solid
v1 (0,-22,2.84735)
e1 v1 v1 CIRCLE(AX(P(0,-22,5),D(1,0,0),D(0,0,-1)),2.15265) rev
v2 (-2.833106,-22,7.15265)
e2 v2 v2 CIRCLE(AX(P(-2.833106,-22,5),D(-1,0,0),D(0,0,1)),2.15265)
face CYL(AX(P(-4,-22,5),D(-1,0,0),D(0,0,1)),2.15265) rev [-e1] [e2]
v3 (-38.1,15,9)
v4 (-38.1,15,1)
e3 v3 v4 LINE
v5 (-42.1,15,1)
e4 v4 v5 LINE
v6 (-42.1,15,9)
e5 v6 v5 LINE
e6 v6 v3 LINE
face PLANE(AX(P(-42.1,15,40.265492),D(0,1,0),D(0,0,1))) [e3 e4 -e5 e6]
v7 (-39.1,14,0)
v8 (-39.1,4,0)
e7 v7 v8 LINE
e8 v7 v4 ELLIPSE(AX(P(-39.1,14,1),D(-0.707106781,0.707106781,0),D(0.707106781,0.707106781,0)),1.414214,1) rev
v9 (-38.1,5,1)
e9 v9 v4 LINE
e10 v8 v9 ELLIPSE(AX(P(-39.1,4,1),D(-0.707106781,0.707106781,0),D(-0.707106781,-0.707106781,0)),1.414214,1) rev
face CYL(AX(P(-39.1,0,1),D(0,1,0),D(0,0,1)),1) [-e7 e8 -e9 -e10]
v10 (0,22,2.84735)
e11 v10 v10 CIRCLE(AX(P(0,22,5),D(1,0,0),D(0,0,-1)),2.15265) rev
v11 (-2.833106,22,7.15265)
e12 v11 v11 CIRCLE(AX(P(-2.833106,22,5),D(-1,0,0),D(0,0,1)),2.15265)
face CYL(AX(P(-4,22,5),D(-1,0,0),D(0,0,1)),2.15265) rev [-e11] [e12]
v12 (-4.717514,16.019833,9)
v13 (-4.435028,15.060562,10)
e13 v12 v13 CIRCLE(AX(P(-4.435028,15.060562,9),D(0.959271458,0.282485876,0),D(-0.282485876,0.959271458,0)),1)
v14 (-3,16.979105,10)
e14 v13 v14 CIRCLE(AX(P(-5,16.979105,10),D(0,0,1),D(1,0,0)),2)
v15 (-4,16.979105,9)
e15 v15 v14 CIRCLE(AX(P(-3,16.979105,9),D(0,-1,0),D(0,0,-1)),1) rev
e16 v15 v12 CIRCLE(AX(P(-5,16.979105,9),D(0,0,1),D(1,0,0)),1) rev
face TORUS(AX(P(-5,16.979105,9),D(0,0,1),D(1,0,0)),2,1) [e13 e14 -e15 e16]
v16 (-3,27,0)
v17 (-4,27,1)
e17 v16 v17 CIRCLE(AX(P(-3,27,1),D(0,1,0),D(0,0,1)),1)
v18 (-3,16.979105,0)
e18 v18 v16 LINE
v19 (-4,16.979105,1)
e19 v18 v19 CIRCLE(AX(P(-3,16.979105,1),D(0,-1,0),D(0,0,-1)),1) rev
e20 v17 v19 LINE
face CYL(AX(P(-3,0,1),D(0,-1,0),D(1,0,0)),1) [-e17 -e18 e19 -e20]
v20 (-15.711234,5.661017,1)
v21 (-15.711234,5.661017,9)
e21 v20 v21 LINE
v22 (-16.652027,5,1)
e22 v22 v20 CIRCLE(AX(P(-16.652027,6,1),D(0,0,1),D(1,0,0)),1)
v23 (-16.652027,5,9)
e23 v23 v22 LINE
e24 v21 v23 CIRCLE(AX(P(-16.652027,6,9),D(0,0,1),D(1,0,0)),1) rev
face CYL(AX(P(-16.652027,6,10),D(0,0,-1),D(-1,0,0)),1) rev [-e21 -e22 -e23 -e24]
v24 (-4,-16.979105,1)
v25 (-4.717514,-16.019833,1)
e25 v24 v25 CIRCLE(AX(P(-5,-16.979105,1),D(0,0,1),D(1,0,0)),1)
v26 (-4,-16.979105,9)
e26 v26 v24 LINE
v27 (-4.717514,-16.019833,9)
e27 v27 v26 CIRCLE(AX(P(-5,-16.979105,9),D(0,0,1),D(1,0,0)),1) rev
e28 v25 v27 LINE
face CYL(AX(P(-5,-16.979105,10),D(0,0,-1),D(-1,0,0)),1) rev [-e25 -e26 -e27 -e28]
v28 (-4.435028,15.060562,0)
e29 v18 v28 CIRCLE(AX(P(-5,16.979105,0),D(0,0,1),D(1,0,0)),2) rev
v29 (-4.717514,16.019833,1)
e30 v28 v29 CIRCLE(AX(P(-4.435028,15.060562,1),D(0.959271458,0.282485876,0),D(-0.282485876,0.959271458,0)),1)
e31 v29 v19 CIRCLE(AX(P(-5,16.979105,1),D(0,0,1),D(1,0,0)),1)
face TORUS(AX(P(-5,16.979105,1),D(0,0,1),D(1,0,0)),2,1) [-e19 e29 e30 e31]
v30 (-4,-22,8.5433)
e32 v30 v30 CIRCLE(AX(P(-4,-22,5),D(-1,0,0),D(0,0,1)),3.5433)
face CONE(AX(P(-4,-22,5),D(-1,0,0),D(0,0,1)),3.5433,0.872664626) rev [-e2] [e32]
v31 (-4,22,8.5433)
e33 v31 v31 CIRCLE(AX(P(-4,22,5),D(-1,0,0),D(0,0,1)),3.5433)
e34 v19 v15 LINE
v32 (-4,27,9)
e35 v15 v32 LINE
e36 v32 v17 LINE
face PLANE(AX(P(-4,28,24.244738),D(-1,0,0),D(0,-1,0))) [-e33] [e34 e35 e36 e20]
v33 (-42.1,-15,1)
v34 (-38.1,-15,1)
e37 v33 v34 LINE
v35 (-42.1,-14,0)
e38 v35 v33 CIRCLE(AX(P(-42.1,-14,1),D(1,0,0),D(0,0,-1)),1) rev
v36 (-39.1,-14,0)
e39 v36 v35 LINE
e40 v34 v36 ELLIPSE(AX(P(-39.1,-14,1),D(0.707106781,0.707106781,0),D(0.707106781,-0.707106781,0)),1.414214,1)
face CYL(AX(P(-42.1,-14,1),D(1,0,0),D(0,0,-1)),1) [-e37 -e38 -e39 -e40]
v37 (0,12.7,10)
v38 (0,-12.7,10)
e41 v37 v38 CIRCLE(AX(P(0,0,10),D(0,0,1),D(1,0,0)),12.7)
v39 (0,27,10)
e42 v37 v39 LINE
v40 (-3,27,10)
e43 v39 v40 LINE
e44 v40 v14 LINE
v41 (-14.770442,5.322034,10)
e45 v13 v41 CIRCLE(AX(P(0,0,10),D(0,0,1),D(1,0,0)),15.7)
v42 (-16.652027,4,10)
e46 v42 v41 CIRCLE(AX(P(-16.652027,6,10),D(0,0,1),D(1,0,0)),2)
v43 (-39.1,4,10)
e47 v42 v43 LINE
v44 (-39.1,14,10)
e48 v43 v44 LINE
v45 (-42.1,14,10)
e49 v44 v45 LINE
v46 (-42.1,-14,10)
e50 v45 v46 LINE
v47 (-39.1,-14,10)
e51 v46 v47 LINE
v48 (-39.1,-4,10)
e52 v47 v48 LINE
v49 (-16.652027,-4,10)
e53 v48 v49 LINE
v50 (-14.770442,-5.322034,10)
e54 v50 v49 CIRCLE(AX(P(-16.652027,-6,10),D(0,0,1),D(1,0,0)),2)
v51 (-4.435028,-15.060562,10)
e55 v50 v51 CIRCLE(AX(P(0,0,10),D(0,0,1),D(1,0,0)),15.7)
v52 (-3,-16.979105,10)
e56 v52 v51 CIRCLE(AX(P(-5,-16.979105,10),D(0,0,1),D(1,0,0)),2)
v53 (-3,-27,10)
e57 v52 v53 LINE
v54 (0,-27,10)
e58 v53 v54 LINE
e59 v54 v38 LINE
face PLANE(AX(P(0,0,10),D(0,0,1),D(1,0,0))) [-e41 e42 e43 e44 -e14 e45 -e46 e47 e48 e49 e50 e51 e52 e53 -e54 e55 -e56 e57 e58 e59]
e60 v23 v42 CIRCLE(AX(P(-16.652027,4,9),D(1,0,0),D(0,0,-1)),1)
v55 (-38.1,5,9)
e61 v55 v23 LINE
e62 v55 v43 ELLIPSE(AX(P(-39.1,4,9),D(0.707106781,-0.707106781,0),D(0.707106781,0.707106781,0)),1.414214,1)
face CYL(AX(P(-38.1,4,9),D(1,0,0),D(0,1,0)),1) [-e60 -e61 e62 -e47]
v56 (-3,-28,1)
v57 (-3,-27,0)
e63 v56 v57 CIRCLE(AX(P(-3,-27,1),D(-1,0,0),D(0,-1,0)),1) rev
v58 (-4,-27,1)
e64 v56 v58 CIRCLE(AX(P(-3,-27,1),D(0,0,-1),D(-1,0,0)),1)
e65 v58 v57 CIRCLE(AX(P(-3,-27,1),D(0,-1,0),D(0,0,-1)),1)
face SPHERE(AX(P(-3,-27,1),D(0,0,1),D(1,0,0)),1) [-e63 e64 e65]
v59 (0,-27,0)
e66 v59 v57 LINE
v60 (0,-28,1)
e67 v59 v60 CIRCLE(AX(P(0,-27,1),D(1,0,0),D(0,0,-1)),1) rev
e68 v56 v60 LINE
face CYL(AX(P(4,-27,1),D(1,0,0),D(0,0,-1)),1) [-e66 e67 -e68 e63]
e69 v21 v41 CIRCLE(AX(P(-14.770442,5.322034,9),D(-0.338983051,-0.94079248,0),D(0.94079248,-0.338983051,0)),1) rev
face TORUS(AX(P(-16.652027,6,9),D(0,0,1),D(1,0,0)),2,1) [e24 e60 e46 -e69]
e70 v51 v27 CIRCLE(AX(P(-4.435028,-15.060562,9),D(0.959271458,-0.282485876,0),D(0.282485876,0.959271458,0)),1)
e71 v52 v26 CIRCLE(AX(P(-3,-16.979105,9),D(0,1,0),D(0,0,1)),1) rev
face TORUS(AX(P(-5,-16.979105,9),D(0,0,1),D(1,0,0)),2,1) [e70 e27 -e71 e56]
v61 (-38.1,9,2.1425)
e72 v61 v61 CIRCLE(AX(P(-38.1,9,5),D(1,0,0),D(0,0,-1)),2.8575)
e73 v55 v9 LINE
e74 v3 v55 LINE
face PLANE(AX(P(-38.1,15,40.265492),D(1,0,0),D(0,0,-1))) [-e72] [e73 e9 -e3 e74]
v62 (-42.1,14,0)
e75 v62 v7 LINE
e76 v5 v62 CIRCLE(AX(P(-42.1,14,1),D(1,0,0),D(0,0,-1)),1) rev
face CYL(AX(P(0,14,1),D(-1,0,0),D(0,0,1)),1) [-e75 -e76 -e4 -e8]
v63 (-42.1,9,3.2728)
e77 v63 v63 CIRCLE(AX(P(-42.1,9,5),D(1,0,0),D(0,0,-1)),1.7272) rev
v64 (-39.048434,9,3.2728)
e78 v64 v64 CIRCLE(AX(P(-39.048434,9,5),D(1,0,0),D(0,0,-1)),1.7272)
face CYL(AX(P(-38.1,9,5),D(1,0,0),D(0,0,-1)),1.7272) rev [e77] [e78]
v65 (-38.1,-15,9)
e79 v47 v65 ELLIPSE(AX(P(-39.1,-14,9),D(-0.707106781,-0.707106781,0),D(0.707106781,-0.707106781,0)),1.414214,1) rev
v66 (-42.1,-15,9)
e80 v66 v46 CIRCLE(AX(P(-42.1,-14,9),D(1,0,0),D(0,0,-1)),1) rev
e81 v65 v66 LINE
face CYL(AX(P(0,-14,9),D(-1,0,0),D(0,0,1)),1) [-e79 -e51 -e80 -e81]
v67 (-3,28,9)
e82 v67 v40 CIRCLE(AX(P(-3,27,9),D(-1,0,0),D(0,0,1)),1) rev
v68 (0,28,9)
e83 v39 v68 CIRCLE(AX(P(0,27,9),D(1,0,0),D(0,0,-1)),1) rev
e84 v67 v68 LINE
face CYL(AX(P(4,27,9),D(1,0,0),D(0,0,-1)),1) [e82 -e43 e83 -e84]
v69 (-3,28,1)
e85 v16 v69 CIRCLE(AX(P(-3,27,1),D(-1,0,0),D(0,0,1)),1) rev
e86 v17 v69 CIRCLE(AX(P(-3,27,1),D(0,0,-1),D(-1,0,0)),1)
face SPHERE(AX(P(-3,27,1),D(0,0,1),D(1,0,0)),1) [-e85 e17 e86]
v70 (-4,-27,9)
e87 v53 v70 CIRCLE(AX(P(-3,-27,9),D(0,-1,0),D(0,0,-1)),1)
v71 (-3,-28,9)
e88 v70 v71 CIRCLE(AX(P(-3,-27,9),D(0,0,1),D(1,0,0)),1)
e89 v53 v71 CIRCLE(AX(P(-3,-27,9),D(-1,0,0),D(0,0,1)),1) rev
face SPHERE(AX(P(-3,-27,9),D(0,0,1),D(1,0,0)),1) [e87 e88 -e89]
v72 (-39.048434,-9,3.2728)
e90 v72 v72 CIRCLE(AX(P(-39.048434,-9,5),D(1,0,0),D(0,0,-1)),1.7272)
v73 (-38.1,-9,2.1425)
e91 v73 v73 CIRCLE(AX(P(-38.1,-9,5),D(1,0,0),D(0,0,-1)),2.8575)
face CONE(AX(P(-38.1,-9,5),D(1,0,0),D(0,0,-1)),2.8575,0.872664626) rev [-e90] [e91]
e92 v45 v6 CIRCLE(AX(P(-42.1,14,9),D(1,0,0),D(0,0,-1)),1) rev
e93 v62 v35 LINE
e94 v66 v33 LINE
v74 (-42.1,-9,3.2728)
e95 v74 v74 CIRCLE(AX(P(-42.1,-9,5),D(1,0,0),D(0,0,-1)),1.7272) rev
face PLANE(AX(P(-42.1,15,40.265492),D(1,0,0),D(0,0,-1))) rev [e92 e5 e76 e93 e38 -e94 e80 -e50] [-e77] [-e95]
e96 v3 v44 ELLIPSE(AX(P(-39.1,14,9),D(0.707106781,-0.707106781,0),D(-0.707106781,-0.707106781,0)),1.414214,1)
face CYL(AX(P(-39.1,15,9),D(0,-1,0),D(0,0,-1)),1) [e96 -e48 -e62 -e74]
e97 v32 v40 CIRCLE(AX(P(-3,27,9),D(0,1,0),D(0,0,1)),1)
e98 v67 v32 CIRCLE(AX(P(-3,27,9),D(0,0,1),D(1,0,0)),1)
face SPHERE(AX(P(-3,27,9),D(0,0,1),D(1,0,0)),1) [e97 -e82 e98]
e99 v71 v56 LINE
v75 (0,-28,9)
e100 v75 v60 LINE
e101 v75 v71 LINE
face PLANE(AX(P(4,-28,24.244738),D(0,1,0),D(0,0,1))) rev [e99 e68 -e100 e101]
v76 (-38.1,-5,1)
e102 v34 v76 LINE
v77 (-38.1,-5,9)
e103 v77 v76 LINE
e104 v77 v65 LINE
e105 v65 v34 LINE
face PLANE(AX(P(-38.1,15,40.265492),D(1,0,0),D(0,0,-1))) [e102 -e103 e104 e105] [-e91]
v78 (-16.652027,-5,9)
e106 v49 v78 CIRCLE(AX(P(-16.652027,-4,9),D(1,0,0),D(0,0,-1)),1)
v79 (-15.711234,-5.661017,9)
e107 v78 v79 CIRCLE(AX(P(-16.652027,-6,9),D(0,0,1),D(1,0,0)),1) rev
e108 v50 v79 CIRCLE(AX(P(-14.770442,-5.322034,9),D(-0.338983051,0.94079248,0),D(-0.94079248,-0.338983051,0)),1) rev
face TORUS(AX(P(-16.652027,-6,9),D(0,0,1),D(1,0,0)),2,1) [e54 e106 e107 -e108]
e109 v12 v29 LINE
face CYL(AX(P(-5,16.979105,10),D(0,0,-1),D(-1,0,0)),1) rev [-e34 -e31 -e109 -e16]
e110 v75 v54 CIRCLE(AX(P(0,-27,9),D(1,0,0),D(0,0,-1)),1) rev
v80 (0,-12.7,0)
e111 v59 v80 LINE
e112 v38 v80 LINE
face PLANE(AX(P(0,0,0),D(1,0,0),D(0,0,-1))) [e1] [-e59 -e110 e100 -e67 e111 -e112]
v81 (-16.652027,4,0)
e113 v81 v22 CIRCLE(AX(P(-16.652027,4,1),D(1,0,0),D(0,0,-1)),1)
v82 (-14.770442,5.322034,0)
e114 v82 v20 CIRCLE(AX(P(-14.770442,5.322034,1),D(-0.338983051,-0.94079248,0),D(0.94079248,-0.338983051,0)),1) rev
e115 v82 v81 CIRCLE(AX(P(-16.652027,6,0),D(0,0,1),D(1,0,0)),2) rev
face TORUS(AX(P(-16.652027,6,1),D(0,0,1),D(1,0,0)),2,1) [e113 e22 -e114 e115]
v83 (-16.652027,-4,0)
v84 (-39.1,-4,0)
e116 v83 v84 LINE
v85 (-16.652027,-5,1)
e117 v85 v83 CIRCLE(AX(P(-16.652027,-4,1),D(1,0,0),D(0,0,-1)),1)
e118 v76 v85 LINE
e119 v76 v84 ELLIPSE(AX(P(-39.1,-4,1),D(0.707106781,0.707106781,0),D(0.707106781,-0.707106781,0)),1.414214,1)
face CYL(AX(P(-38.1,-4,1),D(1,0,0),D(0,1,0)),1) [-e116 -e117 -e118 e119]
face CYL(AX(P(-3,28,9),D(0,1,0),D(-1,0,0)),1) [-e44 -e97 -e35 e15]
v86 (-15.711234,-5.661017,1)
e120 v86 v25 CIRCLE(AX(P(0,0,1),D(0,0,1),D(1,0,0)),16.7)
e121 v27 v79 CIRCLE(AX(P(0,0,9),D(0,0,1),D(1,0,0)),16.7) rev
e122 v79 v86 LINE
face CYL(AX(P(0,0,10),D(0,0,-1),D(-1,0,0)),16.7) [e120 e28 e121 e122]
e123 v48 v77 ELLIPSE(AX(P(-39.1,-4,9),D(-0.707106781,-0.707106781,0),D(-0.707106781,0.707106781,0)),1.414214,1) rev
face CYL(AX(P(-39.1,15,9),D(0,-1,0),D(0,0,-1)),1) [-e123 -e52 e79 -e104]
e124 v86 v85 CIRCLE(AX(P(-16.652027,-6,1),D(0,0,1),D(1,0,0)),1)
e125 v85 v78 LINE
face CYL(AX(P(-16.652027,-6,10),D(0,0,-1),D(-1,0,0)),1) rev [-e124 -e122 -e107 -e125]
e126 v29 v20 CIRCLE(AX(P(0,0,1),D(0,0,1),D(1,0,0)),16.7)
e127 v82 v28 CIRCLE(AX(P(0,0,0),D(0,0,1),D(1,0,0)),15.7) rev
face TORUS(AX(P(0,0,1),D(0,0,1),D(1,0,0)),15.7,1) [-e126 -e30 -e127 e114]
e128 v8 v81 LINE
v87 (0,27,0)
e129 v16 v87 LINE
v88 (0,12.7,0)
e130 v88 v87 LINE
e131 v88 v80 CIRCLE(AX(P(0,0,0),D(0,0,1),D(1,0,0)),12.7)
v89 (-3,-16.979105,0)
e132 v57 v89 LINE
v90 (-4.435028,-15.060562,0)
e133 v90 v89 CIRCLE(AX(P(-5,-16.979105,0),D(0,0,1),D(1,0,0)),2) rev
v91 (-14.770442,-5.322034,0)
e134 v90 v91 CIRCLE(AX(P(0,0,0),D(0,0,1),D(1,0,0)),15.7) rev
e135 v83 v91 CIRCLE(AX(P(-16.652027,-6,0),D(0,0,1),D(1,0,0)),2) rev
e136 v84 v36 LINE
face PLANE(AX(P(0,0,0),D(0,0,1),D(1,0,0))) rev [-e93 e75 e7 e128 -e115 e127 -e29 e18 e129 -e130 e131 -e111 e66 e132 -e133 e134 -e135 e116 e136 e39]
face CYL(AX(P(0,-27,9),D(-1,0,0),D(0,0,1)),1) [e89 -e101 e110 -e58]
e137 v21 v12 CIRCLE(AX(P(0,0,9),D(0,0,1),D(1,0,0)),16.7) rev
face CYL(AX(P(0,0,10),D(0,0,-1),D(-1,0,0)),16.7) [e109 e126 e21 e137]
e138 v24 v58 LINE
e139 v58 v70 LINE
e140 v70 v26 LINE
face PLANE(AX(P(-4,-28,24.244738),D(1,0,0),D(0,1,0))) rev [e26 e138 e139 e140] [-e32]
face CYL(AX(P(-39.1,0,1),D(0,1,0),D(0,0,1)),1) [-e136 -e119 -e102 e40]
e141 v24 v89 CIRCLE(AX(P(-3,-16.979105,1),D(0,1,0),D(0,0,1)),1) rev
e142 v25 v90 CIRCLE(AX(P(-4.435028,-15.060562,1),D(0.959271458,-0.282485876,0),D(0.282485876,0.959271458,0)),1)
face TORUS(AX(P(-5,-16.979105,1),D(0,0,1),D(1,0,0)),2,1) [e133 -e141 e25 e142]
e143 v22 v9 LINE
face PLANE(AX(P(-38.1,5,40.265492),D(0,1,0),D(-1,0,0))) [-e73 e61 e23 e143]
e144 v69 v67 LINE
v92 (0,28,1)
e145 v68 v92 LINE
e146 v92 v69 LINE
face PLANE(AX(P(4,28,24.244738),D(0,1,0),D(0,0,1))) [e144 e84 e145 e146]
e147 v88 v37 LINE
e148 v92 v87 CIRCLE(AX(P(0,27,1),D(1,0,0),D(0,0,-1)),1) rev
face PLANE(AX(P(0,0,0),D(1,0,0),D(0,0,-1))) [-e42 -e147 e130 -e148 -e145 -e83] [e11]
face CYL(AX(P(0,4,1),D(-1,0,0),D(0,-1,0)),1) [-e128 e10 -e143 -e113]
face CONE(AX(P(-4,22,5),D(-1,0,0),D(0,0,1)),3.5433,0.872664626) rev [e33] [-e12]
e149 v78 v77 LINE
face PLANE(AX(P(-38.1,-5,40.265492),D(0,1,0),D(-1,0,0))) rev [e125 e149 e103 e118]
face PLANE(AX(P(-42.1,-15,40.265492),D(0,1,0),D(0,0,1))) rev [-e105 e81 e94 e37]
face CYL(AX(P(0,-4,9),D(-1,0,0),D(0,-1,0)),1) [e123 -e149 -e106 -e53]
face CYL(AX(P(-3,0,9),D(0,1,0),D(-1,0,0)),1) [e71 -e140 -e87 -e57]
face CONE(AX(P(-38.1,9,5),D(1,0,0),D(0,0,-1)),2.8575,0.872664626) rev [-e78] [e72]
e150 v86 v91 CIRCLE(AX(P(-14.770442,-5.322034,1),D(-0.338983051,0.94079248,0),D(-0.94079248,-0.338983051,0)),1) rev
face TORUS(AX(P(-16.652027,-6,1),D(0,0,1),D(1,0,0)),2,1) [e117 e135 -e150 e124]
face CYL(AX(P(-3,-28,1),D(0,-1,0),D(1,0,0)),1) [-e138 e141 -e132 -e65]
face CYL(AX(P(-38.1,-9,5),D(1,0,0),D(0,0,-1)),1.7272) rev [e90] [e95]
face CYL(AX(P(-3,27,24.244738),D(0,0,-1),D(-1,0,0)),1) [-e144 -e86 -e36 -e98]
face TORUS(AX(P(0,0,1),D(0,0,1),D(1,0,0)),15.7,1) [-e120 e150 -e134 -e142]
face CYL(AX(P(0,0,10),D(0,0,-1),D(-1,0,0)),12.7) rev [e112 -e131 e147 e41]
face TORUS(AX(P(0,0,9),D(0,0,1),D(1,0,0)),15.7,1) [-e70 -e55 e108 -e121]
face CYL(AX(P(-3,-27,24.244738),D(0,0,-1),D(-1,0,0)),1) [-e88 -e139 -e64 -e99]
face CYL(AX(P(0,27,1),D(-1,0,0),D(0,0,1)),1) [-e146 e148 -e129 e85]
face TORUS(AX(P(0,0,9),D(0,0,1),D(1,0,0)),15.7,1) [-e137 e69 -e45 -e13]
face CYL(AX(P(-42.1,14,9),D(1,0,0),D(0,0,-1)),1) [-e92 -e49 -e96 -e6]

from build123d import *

# Parameters (mm, degrees)
SKETCH1_R                                         = 16.7
SKETCH1_R_2                                       = 12.7
BOSS_EXTRUDE1_DEPTH                               = 10
SKETCH2_W                                         = 22.16607393
SKETCH2_H                                         = 10
SKETCH2_W_2                                       = 4
SKETCH2_H_2                                       = 30
BOSS_EXTRUDE2_DEPTH                               = 10
SKETCH4_W                                         = 8
SKETCH4_H                                         = 11.78611706
BOSS_EXTRUDE3_DEPTH                               = 10
FILLET3_R                                         = 1
CSK_FOR_6_FLAT_HEAD_MACHINE_SCREW_100_D           = 4.3053
CSK_FOR_6_FLAT_HEAD_MACHINE_SCREW_100_CSINK_D     = 7.0866
CSK_FOR_6_FLAT_HEAD_MACHINE_SCREW_100_CSINK_ANGLE = 100
INTERSECT3_OUTLINE_R                              = 2.15265
INTERSECT3_DEPTH                                  = 16.7


# Read off the part's stored shape, not the designer's step: CSK for #4 Flat Head Machine Screw (100)1, Intersect3
with BuildPart() as part:
    # Sketch1 → Boss-Extrude1 (new body)
    with BuildSketch(Plane.XY):
        Circle(SKETCH1_R)
        Circle(SKETCH1_R_2, mode=Mode.SUBTRACT)
    extrude(amount=BOSS_EXTRUDE1_DEPTH)

    # Sketch2 → Boss-Extrude2 (add)
    with BuildSketch(Plane(origin=(0, 0, 0), x_dir=(-1, 0, 0), z_dir=(0, 0, -1))):
        with Locations((27.016963035, 0)):
            Rectangle(SKETCH2_W, SKETCH2_H)
        with Locations((40.1, 0)):
            Rectangle(SKETCH2_W_2, SKETCH2_H_2)
    extrude(amount=-BOSS_EXTRUDE2_DEPTH)

    # Sketch4 → Boss-Extrude3 (add)
    with BuildSketch(Plane(origin=(0, 0, 0), x_dir=(-1, 0, 0), z_dir=(0, 0, -1))):
        with Locations((0, 22.10694147)):
            Rectangle(SKETCH4_W, SKETCH4_H)
    boss_extrude3 = extrude(amount=-BOSS_EXTRUDE3_DEPTH)

    # Mirror1: Boss-Extrude3 across plane
    add(boss_extrude3.mirror(Plane.ZX))

    # Fillet3
    fillet3_edges = [part.edges().sort_by_distance(p)[0] for p in [
        (-11.435827246, -12.170121413, 10),
        (-11.435827246, -12.170121413, 0),
        (-38.1, 10, 10),
        (-40.1, -15, 10),
        (-27.016963035, -5, 10),
        (-38.1, -10, 0),
        (-40.1, 15, 0),
        (-38.1, 10, 0),
        (-27.016963035, 5, 0),
        (-38.1, -10, 10),
        (-40.1, -15, 0),
        (-40.1, 15, 10),
        (-15.93392607, -5, 5),
        (-27.016963035, -5, 0),
        (-27.016963035, 5, 10),
        (-15.93392607, 5, 5),
        (-11.435827246, 12.170121413, 0),
        (-11.435827246, 12.170121413, 10),
        (-4, 22.10694147, 0),
        (0, 28, 0),
        (4, 22.10694147, 0),
        (0, 28, 10),
        (4, 28, 5),
        (4, 22.10694147, 10),
        (4, 16.21388294, 5),
        (-4, 16.21388294, 5),
        (-4, 22.10694147, 10),
        (-4, 28, 5),
        (16.7, 0, 0),
        (16.7, 0, 10),
        (-4, -16.21388294, 5),
        (-4, -22.10694147, 0),
        (-4, -28, 5),
        (0, -28, 0),
        (4, -28, 5),
        (4, -22.10694147, 0),
        (4, -16.21388294, 5),
        (-4, -22.10694147, 10),
        (0, -28, 10),
        (4, -22.10694147, 10),
    ]]
    fillet(fillet3_edges, radius=FILLET3_R)

    # CSK for _4 Flat Head Machine Screw _ 2 → CSK for #4 Flat Head Machine Screw (100)1 (revolve, cut)
    with BuildSketch(Plane(origin=(0, -9, 5), x_dir=(0, 1, 0), z_dir=(0, 0, -1))):
        Polygon((0, -42.1), (1.7272, -42.1), (1.7272, -39.048434313), (2.8575, -38.1), (0, -38.1), align=None)
    csk_for_4_flat_head_machine_screw_100 = revolve(axis=Axis((0, -9, 5), (1, 0, 0)), mode=Mode.SUBTRACT)

    # Mirror2: CSK for #4 Flat Head Machine Screw (100)1 across plane
    add(csk_for_4_flat_head_machine_screw_100.mirror(Plane.ZX), mode=Mode.SUBTRACT)

    # CSK for #6 Flat Head Machine Screw (100)5 (through all)
    with Locations(Plane.ZY.offset(4)):
        with Locations((5, -22)):
            csk_for_6_flat_head_machine_screw_100 = CounterSinkHole(CSK_FOR_6_FLAT_HEAD_MACHINE_SCREW_100_D / 2, CSK_FOR_6_FLAT_HEAD_MACHINE_SCREW_100_CSINK_D / 2, counter_sink_angle=CSK_FOR_6_FLAT_HEAD_MACHINE_SCREW_100_CSINK_ANGLE)

    # Mirror5: CSK for #6 Flat Head Machine Screw (100)5 across plane
    add(csk_for_6_flat_head_machine_screw_100.mirror(Plane.ZX), mode=Mode.SUBTRACT)

    # Intersect3 outline → Intersect3 (cut)
    with BuildSketch(Plane.YZ):
        with BuildLine():
            ThreePointArc((28, 9), (27.707106781, 9.707106781), (27, 10))
            Line((27, 10), (-27, 10))
            ThreePointArc((-27, 10), (-27.707106781, 9.707106781), (-28, 9))
            Line((-28, 9), (-28, 1))
            ThreePointArc((-28, 1), (-27.707106781, 0.292893219), (-27, 0))
            Line((-27, 0), (27, 0))
            ThreePointArc((27, 0), (27.707106781, 0.292893219), (28, 1))
            Line((28, 1), (28, 9))
        make_face()
        with Locations((-22, 5)):
            Circle(INTERSECT3_OUTLINE_R, mode=Mode.SUBTRACT)
        with Locations((22, 5)):
            Circle(INTERSECT3_OUTLINE_R, mode=Mode.SUBTRACT)
    extrude(amount=INTERSECT3_DEPTH, mode=Mode.SUBTRACT)


solid = part.part
